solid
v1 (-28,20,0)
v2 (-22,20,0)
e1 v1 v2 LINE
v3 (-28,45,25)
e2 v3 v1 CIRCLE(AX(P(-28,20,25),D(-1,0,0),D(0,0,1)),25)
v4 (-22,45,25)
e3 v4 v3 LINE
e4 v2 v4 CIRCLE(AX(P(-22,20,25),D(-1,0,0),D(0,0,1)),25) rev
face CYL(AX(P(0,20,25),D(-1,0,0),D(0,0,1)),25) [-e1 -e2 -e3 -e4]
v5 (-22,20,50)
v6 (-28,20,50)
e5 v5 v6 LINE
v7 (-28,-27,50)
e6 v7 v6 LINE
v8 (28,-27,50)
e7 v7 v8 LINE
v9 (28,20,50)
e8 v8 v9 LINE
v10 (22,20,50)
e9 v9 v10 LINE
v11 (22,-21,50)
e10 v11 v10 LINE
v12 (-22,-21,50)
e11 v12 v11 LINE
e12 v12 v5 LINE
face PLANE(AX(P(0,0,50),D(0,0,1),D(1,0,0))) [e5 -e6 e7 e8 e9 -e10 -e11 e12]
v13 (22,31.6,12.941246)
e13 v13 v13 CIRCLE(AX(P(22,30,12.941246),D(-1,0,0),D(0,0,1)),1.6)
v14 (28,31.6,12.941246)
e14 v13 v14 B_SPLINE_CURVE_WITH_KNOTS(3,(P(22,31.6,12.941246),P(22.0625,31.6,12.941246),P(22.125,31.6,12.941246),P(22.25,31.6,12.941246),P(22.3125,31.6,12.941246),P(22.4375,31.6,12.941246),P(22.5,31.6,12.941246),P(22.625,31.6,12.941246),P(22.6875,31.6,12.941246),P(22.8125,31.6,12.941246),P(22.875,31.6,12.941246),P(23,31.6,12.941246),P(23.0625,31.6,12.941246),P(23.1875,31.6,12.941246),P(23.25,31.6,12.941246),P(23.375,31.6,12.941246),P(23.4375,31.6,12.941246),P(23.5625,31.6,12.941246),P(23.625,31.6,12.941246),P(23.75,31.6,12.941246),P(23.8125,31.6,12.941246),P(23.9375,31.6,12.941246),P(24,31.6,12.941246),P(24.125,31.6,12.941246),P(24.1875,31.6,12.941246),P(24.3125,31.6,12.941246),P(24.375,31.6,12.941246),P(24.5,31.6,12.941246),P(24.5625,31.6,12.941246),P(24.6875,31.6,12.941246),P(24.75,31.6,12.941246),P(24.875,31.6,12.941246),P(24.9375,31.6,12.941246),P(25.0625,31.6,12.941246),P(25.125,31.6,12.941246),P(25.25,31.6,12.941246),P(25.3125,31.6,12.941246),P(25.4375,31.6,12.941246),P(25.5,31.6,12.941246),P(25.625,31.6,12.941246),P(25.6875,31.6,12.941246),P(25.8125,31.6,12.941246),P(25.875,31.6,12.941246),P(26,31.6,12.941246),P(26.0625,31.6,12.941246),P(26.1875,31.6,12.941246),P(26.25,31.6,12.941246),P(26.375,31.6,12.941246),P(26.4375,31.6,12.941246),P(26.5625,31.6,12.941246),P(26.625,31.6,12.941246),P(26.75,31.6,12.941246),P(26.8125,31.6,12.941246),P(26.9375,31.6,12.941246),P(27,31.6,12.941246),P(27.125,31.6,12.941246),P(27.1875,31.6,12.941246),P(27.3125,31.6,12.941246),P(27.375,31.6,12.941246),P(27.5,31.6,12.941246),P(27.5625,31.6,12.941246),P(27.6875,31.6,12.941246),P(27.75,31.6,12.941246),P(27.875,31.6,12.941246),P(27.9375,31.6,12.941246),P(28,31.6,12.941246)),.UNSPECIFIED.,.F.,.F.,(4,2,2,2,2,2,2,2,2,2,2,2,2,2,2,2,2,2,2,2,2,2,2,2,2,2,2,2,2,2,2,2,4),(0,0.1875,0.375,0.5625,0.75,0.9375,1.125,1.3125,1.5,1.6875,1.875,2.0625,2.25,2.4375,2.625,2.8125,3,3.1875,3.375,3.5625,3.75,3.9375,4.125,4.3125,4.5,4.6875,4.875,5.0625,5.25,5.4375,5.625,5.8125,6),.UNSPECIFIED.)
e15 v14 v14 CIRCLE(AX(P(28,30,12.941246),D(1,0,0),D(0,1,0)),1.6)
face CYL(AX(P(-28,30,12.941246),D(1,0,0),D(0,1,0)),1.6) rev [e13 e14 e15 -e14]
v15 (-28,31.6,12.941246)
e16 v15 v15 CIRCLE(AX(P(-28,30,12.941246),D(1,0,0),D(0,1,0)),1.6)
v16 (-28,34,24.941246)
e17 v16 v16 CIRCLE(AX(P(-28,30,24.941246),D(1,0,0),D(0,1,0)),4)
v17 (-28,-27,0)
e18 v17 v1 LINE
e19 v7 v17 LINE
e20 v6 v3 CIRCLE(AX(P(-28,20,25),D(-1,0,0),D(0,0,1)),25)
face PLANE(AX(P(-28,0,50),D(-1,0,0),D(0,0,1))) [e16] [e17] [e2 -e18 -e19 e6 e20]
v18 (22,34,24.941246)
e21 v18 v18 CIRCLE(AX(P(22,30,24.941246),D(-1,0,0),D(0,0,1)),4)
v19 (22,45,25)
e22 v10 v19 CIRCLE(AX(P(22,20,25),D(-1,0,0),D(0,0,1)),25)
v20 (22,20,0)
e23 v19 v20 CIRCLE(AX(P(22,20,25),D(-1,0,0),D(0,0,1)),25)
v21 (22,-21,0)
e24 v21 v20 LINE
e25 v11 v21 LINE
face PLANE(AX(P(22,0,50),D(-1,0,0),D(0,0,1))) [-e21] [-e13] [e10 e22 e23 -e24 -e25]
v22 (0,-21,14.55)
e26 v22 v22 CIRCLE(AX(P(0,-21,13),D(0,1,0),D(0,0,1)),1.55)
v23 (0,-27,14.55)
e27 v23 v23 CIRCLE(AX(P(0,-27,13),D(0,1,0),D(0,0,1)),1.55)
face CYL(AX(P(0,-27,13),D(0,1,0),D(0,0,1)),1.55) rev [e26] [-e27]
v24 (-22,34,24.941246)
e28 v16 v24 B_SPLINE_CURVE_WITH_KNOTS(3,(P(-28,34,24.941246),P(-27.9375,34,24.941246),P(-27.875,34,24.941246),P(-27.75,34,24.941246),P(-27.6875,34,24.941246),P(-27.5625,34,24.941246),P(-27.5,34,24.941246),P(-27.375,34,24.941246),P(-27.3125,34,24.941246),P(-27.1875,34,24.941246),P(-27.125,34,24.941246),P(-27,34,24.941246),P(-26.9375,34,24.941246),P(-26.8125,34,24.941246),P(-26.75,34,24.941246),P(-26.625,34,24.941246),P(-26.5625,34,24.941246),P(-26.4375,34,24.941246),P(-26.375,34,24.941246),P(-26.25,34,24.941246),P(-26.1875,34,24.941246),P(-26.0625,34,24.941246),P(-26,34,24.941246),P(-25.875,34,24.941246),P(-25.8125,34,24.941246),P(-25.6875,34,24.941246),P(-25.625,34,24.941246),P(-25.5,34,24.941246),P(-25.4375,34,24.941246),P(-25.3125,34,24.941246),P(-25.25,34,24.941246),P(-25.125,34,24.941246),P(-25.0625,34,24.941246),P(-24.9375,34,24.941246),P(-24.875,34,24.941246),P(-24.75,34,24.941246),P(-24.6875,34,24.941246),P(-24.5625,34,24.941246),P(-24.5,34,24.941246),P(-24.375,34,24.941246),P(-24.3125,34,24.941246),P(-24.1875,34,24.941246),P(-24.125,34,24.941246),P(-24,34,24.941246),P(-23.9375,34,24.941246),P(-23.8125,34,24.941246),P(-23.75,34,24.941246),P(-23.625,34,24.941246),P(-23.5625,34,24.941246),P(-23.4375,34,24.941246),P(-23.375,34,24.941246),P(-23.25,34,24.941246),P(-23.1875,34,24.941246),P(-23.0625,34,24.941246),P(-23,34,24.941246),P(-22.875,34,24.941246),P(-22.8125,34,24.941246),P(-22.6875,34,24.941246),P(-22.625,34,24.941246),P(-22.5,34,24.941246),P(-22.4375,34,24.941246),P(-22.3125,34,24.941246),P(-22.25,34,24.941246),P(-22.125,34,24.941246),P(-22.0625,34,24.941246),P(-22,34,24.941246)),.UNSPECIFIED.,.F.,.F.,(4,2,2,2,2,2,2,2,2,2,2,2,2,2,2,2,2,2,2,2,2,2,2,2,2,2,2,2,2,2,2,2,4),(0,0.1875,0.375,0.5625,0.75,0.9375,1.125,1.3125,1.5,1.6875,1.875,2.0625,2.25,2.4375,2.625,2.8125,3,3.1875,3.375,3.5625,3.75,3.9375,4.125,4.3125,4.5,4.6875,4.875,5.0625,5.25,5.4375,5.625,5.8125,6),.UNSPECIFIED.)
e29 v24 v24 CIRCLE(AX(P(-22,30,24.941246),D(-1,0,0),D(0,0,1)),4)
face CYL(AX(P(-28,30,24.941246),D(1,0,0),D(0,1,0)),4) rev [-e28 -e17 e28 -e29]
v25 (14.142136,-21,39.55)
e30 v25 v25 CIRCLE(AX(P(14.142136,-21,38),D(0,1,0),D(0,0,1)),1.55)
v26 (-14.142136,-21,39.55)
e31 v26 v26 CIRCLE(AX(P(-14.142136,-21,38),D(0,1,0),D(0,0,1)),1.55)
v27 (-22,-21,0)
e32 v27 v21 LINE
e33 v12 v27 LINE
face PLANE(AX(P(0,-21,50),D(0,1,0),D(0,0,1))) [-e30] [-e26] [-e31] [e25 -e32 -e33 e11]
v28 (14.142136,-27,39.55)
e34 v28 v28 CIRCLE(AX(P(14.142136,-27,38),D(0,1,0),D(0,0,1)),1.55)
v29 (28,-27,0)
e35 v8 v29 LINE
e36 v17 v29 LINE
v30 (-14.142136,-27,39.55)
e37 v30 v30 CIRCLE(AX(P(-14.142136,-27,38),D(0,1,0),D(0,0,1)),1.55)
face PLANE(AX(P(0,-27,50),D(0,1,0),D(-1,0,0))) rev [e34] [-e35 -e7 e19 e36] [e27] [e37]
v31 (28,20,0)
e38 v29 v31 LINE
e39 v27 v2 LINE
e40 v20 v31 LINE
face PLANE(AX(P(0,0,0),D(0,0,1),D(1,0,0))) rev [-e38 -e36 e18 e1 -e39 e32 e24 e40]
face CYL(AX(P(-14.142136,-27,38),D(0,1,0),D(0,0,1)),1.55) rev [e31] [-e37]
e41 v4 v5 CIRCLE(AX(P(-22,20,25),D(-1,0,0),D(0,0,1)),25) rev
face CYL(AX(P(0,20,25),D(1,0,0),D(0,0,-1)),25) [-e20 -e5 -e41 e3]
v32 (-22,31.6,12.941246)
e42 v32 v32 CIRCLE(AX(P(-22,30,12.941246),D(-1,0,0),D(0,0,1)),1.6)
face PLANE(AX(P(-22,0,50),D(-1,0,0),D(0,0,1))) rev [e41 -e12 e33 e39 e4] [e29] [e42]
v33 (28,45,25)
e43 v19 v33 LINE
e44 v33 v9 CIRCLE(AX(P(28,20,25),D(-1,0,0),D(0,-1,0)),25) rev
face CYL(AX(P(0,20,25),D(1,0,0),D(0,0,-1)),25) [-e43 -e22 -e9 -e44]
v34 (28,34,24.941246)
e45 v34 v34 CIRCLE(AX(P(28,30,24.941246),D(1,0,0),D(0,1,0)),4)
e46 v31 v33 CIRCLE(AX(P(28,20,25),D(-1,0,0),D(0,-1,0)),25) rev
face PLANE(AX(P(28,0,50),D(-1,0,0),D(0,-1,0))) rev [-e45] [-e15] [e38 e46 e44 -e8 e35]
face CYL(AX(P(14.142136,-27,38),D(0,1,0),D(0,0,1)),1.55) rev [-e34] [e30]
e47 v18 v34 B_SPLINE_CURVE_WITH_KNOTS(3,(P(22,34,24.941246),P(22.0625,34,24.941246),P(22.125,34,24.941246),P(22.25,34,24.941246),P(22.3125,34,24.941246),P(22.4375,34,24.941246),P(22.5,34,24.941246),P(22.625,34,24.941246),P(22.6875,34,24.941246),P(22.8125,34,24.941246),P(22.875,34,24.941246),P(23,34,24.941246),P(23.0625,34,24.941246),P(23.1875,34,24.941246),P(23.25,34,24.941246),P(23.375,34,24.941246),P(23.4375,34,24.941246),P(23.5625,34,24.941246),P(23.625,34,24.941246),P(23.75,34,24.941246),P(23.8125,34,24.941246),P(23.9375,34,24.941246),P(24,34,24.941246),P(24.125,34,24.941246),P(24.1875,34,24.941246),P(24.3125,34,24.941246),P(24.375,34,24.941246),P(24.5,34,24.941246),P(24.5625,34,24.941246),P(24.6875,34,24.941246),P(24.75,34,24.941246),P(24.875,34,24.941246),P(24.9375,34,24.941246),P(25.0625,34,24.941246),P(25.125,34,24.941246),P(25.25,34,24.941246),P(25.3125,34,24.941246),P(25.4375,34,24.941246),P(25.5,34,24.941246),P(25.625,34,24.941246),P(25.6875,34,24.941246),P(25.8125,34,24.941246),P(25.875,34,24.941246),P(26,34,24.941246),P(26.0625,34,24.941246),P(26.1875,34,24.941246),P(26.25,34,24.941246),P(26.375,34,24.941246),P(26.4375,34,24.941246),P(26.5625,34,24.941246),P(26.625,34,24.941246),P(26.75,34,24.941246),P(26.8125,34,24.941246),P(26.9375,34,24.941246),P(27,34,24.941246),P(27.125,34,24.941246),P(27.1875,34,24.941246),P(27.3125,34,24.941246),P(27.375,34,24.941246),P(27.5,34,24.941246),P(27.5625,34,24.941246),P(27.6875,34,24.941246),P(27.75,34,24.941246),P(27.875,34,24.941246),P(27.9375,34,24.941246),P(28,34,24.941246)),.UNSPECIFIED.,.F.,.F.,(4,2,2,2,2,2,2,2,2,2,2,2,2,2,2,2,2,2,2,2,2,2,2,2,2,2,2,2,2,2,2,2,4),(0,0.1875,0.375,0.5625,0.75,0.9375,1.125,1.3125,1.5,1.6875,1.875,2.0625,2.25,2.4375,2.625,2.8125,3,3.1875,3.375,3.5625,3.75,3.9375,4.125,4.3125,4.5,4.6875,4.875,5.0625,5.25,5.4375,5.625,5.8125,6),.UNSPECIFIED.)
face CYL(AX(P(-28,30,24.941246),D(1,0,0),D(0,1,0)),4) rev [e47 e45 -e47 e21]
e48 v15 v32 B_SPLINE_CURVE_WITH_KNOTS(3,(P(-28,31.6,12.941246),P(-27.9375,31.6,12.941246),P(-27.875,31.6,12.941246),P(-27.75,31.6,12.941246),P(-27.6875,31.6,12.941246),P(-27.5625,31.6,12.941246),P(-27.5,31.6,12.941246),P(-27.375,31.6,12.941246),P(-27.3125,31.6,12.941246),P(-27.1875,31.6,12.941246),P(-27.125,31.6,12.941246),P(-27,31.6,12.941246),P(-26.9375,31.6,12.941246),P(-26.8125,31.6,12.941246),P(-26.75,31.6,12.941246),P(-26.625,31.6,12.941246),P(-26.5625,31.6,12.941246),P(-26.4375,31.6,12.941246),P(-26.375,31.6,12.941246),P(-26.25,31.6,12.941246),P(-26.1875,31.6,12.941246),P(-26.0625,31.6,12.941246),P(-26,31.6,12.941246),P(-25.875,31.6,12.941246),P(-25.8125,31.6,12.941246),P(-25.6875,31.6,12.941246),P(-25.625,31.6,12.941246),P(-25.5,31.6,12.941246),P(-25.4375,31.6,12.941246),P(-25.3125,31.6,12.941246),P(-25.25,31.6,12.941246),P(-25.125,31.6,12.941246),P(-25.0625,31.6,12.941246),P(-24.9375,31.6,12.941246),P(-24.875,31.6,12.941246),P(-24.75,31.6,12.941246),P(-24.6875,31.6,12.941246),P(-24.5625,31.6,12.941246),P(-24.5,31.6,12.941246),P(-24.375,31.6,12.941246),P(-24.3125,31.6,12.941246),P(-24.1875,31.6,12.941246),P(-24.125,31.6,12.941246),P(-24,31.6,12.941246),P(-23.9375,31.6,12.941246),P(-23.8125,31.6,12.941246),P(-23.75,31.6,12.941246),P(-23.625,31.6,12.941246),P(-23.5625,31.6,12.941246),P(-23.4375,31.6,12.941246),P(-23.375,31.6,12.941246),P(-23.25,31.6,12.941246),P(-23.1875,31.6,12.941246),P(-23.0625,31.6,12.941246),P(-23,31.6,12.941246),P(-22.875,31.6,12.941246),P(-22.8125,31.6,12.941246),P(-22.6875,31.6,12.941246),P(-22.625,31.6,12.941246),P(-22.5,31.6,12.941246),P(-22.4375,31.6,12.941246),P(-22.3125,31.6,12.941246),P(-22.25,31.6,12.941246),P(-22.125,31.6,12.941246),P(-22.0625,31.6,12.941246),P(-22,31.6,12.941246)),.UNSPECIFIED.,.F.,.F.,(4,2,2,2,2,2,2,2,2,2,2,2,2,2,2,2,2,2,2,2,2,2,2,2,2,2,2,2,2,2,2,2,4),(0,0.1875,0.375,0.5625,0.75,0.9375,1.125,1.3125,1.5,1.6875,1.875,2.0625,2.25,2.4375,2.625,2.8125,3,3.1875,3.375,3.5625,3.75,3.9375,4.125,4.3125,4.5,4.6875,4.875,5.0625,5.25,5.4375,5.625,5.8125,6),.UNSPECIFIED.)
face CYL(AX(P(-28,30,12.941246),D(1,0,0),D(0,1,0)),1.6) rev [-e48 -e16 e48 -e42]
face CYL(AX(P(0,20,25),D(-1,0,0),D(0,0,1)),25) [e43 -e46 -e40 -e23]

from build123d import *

# Parameters (mm, degrees)
SKETCH1_W           = 6
SKETCH1_H           = 66
SKETCH1_W_2         = 44
SKETCH1_H_2         = 6
BOSS_EXTRUDE1_DEPTH = 50
FILLET1_R           = 25
SKETCH3_R           = 1.6
SKETCH3_R_2         = 4
CUT_EXTRUDE2_DEPTH  = 88.527138649
SKETCH4_R           = 1.55
CUT_EXTRUDE3_DEPTH  = 88.407093534


with BuildPart() as part:
    # Sketch1 → Boss-Extrude1 (new body)
    with BuildSketch(Plane.XY):
        with Locations((-25, 12)):
            Rectangle(SKETCH1_W, SKETCH1_H)
        with Locations((0, -24)):
            Rectangle(SKETCH1_W_2, SKETCH1_H_2)
        with Locations((-25, -24)):
            Rectangle(SKETCH1_W, SKETCH1_H_2)
        with Locations((25, -24)):
            Rectangle(SKETCH1_W, SKETCH1_H_2)
        with Locations((25, 12)):
            Rectangle(SKETCH1_W, SKETCH1_H)
    extrude(amount=BOSS_EXTRUDE1_DEPTH)

    # Fillet1
    fillet1_edges = [part.edges().sort_by_distance(p)[0] for p in [
        (-25, 45, 50),
        (-25, 45, 0),
        (25, 45, 0),
        (25, 45, 50),
    ]]
    fillet(fillet1_edges, radius=FILLET1_R - 0.0001)  # a hair under: the kernel refuses the full size

    # Sketch3 → Cut-Extrude2 (cut, through all)
    with BuildSketch(Plane(origin=(28, 0, 0), x_dir=(0, 0, -1), z_dir=(1, 0, 0))):
        with Locations(Location((-12.941245902, 30, 0), (0, 0, 90))):
            Circle(SKETCH3_R)
        with Locations(Location((-24.941245902, 30, 0), (0, 0, 90))):
            Circle(SKETCH3_R_2)
    extrude(amount=-CUT_EXTRUDE2_DEPTH, mode=Mode.SUBTRACT)

    # Sketch4 → Cut-Extrude3 (cut, through all)
    with BuildSketch(Plane(origin=(0, -21, 0), x_dir=(1, 0, 0), z_dir=(0, 1, 0))):
        with Locations(Location((-14.142135624, -38, 0), (0, 0, 270))):
            Circle(SKETCH4_R)
        with Locations(Location((14.142135624, -38, 0), (0, 0, 270))):
            Circle(SKETCH4_R)
        with Locations(Location((0, -13, 0), (0, 0, 270))):
            Circle(SKETCH4_R)
    extrude(amount=-CUT_EXTRUDE3_DEPTH, mode=Mode.SUBTRACT)


solid = part.part
